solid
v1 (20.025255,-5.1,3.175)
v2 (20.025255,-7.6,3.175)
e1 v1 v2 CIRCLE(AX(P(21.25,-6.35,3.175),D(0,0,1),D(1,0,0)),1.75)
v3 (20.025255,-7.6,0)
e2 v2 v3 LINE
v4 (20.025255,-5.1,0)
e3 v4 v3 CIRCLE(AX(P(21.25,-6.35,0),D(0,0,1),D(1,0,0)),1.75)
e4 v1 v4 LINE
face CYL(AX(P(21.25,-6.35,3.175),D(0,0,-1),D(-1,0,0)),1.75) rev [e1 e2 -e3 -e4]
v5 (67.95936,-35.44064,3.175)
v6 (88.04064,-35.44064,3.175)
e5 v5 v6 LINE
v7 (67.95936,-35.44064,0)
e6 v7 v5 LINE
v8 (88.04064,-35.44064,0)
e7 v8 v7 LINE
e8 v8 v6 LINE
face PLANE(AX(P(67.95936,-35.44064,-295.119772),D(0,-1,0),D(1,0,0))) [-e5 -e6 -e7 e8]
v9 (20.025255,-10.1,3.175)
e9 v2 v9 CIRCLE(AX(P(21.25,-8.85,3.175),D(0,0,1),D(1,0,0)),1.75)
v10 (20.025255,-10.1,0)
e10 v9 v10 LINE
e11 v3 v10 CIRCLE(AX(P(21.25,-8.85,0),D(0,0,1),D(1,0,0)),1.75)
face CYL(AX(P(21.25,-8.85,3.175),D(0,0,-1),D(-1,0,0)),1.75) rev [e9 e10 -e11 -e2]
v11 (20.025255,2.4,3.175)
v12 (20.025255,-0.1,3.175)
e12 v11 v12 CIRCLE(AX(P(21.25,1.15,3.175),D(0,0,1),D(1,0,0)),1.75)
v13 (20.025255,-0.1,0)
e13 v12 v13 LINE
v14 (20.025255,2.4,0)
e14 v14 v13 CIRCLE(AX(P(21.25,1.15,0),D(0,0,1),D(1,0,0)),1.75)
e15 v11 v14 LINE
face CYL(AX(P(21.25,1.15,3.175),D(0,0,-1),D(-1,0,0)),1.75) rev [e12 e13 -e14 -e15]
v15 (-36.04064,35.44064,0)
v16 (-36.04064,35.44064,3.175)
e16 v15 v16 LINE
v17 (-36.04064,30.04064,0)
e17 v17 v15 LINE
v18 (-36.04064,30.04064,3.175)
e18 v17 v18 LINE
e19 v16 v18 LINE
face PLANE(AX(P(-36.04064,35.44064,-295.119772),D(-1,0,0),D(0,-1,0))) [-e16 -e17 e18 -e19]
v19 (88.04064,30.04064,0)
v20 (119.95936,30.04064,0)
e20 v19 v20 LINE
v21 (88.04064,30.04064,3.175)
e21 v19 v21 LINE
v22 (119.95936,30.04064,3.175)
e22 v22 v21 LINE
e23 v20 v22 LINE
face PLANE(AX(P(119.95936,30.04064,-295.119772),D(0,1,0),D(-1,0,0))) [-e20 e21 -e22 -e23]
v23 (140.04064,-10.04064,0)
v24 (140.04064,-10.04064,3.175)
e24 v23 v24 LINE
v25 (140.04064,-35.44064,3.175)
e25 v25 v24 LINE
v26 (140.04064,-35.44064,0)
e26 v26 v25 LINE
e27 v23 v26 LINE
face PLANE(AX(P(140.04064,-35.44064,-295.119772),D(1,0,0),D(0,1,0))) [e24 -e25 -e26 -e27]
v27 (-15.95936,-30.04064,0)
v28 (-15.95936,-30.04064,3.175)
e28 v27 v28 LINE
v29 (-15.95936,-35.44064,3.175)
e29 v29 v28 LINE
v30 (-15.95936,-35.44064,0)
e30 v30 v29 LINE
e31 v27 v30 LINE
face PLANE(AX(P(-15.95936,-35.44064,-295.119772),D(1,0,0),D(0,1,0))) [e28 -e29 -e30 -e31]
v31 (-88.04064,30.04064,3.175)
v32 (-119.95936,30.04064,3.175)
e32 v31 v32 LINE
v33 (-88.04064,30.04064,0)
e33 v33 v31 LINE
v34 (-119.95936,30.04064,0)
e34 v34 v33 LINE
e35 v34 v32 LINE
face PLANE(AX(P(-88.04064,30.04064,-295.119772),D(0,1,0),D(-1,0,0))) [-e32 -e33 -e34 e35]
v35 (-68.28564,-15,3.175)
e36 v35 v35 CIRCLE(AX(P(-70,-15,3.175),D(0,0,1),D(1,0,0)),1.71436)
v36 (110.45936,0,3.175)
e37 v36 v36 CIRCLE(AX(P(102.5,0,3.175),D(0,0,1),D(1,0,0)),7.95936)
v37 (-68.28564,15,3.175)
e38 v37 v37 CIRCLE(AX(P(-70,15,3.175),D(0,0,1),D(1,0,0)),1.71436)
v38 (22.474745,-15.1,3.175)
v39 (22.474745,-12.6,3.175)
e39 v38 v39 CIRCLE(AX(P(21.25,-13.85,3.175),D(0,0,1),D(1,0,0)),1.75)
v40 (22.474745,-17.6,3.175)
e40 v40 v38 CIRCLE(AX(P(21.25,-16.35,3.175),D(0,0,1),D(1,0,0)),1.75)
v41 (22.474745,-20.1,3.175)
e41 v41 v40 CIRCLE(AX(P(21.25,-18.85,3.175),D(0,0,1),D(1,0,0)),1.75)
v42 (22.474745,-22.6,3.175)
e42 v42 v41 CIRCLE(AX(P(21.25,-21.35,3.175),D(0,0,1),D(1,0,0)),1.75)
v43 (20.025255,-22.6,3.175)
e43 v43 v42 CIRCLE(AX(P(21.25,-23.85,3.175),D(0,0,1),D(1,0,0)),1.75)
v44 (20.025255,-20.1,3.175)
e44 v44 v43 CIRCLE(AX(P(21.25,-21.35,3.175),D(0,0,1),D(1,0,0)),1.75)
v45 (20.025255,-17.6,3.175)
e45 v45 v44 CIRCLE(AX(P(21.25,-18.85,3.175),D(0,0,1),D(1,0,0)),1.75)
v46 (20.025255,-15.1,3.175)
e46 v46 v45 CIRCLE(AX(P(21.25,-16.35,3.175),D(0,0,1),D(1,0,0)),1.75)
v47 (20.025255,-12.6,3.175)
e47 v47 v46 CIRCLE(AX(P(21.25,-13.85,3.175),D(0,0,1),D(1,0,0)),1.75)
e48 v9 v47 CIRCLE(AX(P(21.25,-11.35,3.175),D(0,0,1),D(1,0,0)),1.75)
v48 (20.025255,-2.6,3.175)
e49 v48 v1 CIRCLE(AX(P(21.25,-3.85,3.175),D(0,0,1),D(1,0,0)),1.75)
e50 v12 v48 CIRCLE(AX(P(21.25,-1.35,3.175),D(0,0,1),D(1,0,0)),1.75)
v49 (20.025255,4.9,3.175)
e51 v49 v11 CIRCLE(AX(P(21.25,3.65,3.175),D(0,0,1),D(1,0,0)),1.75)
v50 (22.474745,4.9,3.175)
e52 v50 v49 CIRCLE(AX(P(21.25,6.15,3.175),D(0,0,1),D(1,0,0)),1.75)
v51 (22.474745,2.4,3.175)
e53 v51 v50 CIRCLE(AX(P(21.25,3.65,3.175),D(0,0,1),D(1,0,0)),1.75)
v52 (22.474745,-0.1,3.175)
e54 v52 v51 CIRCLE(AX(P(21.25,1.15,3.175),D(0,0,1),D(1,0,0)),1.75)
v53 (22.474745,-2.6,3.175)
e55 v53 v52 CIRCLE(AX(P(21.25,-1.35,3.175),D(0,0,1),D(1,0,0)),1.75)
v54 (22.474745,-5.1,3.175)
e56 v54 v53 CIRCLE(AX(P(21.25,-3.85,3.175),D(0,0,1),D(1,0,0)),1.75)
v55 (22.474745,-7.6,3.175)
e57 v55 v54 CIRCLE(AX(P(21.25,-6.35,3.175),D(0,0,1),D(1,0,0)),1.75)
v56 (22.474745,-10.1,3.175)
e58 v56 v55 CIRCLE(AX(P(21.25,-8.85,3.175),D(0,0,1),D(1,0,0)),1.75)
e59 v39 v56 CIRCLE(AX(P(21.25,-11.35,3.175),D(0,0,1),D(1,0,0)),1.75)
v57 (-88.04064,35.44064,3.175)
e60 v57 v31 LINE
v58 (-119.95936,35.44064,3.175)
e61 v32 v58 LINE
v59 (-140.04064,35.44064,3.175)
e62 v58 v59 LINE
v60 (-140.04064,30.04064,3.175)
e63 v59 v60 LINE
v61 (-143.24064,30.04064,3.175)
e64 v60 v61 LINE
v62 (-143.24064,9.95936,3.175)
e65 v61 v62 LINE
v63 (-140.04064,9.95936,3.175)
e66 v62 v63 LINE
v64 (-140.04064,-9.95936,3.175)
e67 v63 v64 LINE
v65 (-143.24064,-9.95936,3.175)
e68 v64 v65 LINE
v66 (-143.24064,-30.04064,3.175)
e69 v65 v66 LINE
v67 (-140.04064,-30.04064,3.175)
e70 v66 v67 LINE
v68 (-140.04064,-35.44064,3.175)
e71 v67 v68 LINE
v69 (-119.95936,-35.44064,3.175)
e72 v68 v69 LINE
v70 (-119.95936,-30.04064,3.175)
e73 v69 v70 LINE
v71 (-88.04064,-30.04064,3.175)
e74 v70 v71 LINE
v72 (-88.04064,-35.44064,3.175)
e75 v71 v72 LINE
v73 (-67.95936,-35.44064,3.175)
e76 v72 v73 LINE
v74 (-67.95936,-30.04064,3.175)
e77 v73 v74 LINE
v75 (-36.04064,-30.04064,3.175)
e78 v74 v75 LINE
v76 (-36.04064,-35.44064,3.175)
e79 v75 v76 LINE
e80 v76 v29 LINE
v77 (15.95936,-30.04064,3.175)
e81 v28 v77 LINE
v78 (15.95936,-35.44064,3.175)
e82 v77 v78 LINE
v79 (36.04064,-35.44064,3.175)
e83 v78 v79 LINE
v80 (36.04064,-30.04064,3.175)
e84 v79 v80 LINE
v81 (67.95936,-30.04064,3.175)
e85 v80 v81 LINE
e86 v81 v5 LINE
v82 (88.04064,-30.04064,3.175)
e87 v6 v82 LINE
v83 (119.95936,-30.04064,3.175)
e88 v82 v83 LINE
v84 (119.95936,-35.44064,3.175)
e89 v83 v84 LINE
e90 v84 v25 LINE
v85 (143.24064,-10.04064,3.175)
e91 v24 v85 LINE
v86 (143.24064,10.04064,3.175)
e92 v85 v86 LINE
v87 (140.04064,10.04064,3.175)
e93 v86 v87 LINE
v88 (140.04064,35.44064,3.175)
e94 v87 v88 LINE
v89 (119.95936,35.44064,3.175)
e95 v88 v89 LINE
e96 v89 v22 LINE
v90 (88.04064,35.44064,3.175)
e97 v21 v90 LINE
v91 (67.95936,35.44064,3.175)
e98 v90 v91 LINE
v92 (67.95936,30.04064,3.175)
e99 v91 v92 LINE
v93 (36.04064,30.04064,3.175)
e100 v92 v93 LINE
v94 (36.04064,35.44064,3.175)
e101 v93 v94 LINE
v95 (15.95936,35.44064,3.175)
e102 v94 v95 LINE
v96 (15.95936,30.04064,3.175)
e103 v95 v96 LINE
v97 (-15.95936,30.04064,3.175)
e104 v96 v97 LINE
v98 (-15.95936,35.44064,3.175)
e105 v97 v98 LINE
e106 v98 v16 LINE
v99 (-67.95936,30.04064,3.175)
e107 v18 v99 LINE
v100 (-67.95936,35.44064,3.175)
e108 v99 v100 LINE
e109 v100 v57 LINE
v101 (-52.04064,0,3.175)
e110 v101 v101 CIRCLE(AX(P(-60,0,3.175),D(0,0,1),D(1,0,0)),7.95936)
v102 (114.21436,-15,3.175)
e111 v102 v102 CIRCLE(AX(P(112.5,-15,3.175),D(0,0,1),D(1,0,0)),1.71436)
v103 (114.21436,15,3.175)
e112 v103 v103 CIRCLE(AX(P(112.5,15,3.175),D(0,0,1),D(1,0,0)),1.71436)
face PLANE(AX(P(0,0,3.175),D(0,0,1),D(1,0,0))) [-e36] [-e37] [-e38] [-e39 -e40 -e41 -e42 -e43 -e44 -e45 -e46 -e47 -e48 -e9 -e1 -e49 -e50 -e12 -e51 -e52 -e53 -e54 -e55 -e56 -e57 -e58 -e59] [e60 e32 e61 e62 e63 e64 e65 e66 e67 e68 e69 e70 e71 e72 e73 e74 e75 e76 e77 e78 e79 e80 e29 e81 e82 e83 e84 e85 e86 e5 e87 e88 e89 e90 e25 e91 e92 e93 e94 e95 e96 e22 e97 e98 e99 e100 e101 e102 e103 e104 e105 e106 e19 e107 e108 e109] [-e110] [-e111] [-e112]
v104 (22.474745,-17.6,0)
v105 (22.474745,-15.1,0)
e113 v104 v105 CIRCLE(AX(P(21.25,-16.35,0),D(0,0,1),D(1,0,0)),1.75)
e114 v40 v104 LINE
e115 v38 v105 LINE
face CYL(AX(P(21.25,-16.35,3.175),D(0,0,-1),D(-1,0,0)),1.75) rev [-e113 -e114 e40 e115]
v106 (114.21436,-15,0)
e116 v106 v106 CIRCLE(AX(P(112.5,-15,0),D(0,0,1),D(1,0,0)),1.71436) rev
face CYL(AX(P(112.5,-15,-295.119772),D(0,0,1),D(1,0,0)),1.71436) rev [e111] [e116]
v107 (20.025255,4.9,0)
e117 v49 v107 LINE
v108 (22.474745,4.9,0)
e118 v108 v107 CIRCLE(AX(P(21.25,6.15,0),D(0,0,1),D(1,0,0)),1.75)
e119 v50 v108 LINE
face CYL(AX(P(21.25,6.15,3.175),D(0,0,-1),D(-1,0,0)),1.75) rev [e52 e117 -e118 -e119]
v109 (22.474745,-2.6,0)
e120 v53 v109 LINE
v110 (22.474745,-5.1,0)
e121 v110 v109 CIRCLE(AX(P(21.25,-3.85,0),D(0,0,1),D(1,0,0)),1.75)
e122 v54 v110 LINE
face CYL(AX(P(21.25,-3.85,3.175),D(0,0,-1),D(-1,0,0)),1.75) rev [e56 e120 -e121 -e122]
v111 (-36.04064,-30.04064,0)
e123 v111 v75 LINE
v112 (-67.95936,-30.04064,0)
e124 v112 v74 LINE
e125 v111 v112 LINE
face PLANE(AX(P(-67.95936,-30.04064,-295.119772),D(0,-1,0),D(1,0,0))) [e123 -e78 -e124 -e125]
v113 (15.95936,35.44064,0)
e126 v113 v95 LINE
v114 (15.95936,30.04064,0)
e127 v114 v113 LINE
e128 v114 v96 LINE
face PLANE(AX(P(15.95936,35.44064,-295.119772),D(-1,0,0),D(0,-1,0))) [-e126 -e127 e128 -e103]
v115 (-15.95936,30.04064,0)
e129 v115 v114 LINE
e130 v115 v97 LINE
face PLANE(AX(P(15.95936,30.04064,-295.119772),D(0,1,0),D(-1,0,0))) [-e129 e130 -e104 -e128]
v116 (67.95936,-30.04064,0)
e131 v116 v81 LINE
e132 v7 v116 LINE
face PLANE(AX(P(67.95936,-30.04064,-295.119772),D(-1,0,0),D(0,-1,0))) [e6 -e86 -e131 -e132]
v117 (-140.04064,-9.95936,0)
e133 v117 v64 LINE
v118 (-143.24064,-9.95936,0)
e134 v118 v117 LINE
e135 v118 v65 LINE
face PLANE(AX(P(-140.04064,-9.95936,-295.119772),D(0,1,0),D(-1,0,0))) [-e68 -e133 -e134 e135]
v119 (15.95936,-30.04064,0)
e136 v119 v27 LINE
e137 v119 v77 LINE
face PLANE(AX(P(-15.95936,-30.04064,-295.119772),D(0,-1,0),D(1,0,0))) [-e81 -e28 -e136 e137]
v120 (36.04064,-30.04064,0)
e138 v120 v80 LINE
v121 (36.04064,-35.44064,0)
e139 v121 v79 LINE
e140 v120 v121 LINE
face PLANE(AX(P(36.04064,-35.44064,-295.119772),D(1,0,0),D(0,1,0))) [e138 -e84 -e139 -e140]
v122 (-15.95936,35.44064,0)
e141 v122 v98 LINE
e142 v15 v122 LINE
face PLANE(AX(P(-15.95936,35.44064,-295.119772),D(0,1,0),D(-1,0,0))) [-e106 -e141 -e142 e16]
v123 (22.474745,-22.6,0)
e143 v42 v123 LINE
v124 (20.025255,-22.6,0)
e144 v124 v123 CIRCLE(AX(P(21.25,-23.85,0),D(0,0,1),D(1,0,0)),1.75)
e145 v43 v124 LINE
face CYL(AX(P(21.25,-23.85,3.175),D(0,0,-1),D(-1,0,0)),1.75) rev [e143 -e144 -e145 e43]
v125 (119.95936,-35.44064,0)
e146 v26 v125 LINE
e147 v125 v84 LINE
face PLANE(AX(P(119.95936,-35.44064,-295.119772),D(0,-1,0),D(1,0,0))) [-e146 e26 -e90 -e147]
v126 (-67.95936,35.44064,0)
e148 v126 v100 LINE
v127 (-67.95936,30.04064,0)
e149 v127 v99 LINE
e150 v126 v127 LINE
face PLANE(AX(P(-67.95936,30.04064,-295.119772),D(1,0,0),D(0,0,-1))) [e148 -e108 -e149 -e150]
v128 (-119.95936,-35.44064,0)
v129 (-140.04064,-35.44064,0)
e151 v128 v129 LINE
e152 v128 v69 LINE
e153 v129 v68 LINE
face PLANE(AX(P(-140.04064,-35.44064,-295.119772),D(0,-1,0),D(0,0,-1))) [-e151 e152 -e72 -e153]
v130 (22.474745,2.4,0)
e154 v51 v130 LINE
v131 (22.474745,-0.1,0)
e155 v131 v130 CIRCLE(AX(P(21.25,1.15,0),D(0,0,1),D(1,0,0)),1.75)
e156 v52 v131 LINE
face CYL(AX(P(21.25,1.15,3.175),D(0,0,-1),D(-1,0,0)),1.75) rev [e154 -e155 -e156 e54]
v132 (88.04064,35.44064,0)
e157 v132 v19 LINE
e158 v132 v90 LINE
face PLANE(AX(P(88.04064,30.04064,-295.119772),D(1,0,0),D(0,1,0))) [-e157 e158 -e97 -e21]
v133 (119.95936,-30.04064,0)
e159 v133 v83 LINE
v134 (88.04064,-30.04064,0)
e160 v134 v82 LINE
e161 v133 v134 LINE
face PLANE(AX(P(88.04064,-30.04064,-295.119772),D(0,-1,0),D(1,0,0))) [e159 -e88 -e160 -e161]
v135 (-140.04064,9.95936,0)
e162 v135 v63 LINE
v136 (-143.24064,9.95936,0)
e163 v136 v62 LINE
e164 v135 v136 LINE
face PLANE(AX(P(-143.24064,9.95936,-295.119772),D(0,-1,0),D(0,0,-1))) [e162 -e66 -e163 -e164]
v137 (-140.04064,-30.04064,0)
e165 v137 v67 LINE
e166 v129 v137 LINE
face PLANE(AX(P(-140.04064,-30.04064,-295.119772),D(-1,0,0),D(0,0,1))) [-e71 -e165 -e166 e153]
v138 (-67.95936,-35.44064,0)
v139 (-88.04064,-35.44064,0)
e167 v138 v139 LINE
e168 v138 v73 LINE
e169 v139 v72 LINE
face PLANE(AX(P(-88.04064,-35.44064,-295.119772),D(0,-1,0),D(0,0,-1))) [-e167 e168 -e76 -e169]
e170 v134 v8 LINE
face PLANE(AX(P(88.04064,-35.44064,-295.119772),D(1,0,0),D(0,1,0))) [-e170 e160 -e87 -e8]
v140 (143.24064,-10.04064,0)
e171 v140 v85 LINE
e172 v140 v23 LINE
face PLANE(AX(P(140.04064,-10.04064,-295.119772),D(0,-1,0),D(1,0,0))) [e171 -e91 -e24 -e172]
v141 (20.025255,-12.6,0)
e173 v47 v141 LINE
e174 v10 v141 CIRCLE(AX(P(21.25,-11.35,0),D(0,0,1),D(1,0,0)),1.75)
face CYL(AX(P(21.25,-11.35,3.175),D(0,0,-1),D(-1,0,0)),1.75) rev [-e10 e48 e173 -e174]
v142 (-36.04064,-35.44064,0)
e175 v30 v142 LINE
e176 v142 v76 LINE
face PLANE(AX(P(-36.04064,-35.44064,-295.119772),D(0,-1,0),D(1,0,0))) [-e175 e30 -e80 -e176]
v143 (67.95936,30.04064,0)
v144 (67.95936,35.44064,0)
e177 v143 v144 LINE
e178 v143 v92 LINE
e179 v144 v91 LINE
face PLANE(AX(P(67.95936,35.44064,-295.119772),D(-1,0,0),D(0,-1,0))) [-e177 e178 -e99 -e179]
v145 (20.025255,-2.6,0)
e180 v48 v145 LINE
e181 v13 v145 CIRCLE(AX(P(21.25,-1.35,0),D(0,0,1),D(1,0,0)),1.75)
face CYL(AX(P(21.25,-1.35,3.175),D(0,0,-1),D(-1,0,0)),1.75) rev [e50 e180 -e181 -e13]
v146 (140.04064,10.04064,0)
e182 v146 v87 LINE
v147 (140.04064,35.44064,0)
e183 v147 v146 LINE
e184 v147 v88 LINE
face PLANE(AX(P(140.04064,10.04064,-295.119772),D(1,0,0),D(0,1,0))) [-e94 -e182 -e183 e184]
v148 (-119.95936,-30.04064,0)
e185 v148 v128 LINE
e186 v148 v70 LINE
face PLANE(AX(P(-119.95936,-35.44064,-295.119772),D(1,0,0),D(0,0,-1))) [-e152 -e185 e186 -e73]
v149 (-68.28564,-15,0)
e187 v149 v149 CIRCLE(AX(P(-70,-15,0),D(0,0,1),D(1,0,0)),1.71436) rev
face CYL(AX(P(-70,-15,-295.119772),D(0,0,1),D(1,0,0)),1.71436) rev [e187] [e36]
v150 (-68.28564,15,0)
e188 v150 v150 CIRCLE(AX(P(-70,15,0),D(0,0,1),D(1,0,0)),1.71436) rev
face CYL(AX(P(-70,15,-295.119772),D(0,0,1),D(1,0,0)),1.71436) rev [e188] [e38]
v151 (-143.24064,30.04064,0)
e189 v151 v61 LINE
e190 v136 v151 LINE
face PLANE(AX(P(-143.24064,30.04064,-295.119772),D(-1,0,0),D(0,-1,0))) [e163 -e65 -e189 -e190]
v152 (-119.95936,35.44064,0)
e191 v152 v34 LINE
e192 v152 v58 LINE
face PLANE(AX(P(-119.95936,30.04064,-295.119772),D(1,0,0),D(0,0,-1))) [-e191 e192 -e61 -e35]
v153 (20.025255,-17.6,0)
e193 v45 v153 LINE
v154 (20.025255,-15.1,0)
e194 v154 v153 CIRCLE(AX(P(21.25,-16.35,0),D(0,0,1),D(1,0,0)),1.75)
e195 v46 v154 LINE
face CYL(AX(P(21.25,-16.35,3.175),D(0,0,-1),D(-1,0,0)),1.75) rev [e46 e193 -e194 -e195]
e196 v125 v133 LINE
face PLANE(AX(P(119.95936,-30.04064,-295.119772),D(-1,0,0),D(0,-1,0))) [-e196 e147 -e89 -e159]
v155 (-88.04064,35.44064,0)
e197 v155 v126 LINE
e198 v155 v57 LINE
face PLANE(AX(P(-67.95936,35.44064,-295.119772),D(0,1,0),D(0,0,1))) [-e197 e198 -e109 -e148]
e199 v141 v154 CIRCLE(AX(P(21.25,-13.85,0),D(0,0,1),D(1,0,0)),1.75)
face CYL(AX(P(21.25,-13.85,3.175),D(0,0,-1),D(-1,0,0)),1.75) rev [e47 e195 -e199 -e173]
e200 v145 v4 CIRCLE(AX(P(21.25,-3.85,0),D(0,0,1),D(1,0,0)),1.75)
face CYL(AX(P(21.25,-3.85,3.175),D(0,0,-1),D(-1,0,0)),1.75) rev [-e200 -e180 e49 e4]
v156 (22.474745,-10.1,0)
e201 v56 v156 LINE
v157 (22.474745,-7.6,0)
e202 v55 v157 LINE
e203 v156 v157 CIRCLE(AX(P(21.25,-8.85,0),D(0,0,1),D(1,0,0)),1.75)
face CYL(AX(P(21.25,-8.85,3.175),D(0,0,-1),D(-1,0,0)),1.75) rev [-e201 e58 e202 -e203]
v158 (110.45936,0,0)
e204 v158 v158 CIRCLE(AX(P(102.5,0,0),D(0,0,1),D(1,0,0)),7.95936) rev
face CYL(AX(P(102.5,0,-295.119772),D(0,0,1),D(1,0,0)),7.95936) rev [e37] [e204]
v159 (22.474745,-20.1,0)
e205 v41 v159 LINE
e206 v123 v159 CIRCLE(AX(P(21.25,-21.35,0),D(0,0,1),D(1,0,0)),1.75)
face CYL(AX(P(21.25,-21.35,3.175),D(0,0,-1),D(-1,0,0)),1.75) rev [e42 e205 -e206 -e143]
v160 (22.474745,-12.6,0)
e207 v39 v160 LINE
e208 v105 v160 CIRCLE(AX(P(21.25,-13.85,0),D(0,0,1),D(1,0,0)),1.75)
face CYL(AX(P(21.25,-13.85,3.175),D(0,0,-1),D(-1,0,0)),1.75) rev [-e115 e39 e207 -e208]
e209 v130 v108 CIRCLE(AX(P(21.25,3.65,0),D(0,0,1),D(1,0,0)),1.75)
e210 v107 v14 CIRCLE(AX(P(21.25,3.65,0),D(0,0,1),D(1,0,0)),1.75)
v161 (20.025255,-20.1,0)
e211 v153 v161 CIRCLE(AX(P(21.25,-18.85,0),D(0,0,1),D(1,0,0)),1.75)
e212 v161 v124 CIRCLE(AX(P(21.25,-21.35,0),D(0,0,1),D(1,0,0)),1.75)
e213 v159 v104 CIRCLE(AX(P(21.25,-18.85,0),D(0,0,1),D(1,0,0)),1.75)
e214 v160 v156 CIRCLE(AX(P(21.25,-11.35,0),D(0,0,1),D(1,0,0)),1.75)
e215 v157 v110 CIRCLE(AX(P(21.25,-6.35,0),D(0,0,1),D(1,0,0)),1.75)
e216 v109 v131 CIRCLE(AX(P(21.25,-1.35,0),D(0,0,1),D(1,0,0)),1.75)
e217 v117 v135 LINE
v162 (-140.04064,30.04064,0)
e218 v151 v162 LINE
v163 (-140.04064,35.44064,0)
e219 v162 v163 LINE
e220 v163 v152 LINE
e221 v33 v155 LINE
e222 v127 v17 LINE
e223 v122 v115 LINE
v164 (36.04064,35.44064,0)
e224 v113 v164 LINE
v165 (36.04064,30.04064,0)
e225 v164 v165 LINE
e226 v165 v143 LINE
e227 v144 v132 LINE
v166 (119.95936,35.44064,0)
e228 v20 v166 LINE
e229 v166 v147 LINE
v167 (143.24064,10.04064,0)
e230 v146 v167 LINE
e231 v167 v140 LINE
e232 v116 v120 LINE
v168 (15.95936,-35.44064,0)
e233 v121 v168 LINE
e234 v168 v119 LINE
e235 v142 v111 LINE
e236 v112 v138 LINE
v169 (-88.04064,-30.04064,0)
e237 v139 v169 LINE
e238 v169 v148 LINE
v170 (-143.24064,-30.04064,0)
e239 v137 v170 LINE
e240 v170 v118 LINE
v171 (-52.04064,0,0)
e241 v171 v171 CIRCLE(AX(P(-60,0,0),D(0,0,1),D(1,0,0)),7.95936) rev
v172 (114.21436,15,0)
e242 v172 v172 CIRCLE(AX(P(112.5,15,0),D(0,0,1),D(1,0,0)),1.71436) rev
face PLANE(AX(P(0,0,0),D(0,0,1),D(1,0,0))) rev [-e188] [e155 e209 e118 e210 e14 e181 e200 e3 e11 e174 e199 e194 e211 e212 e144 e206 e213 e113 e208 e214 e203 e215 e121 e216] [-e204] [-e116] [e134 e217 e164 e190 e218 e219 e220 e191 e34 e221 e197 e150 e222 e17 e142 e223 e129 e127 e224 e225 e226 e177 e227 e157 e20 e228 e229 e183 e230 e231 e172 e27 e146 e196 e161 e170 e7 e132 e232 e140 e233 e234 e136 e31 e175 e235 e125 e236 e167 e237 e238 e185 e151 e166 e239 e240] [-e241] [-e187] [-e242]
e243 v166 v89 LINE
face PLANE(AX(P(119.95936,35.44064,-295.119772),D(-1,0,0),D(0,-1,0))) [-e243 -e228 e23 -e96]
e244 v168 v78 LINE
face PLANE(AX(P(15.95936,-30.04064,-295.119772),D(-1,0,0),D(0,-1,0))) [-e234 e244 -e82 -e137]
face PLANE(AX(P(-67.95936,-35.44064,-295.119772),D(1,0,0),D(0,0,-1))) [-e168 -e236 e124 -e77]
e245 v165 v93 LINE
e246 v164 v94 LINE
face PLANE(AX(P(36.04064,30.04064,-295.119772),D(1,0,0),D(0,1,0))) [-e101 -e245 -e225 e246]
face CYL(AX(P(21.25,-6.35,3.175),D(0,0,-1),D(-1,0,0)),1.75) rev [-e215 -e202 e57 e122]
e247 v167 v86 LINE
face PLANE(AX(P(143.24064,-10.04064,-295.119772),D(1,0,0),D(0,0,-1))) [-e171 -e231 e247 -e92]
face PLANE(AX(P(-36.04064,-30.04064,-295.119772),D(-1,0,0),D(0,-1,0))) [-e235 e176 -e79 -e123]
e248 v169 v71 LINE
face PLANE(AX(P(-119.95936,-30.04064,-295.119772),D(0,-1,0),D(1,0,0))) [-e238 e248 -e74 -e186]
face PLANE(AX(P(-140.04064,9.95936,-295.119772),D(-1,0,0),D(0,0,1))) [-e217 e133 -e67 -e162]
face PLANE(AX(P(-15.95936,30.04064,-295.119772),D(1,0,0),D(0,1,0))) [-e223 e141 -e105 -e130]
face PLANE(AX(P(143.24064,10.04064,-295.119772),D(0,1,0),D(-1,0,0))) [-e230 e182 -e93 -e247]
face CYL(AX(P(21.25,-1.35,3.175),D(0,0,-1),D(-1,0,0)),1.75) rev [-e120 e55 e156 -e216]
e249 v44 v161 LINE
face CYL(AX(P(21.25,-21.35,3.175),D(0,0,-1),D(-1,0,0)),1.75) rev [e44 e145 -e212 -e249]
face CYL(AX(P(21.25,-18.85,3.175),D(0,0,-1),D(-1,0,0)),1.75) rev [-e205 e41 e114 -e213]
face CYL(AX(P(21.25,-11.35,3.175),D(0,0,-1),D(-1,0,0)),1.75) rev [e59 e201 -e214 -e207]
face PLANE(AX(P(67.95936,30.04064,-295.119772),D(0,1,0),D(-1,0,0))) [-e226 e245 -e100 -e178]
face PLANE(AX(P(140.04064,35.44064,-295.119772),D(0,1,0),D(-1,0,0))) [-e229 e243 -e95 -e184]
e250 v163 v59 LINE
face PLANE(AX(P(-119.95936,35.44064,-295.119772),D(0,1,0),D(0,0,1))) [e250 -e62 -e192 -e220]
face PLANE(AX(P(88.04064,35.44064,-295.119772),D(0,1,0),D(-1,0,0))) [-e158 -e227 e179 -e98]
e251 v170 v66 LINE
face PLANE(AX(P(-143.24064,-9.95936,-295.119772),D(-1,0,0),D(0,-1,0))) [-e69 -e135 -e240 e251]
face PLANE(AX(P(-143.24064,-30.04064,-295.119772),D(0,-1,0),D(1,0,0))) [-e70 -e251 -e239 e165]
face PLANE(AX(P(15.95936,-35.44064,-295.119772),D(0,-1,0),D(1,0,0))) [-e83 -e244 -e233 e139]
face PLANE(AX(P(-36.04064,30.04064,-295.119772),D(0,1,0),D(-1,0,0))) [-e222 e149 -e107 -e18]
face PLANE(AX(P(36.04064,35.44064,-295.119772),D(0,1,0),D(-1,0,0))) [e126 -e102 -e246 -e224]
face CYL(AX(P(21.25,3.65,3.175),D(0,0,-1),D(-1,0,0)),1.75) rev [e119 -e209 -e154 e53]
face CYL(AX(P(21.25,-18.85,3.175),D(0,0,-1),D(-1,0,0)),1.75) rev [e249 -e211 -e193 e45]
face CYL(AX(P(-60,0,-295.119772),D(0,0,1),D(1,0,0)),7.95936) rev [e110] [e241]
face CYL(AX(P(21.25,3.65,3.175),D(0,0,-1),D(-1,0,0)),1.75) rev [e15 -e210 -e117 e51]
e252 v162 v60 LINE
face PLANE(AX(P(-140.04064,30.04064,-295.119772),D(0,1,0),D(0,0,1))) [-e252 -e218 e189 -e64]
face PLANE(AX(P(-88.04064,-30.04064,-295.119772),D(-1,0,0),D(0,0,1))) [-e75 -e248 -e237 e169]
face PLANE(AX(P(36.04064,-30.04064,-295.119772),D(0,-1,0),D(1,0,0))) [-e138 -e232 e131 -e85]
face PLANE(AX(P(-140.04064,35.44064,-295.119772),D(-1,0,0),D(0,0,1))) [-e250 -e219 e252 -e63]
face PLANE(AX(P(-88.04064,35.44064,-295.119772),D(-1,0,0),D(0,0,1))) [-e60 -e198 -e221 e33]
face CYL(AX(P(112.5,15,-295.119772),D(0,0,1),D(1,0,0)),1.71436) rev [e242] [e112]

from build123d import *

# Parameters (mm, degrees)
BOSS_EXTRUDE1_OUTLINE_R   = 1.755
BOSS_EXTRUDE1_OUTLINE_R_2 = 8
BOSS_EXTRUDE1_DEPTH       = 3.175
BOSS_EXTRUDE2_START       = -3.175
SKETCH5_R                 = 7.95936
SKETCH5_R_2               = 1.71436
BOSS_EXTRUDE2_DEPTH       = 3.175


# Read off the part's stored shape, not the designer's step: Boss-Extrude1
with BuildPart() as part:
    # Boss-Extrude1 outline → Boss-Extrude1 (new body)
    with BuildSketch(Plane.XY):
        Polygon((-140, 10), (-140, -10), (-143.2, -10), (-143.2, -30), (-140, -30), (-140, -35.4), (-120, -35.4), (-120, -30), (-88, -30), (-88, -35.4), (-68, -35.4), (-68, -30), (-36, -30), (-36, -35.4), (-16, -35.4), (-16, -30), (16, -30), (16, -35.4), (36, -35.4), (36, -30), (68, -30), (68, -35.4), (88, -35.4), (88, -30), (120, -30), (120, -35.4), (140, -35.4), (140, -10), (143.2, -10), (143.2, 10), (140, 10), (140, 35.4), (120, 35.4), (120, 30), (88, 30), (88, 35.4), (68, 35.4), (68, 30), (36, 30), (36, 35.4), (16, 35.4), (16, 30), (-16, 30), (-16, 35.4), (-36, 35.4), (-36, 30), (-68, 30), (-68, 35.4), (-88, 35.4), (-88, 30), (-120, 30), (-120, 35.4), (-140, 35.4), (-140, 30), (-143.2, 30), (-143.2, 10), align=None)
        with Locations((-70, -15)):
            Circle(BOSS_EXTRUDE1_OUTLINE_R, mode=Mode.SUBTRACT)
        with BuildLine():
            ThreePointArc((22.474744871, -20.1), (23, -21.35), (22.474744871, -22.6))
            ThreePointArc((22.474744871, -22.6), (21.25, -25.6), (20.025255129, -22.6))
            ThreePointArc((20.025255129, -22.6), (19.5, -21.35), (20.025255129, -20.1))
            ThreePointArc((20.025255129, -20.1), (19.5, -18.85), (20.025255129, -17.6))
            ThreePointArc((20.025255129, -17.6), (19.5, -16.35), (20.025255129, -15.1))
            ThreePointArc((20.025255129, -15.1), (19.5, -13.85), (20.025255129, -12.6))
            ThreePointArc((20.025255129, -12.6), (19.5, -11.35), (20.025255129, -10.1))
            ThreePointArc((20.025255129, -10.1), (19.5, -8.85), (20.025255129, -7.6))
            ThreePointArc((20.025255129, -7.6), (19.5, -6.35), (20.025255129, -5.1))
            ThreePointArc((20.025255129, -5.1), (19.5, -3.85), (20.025255129, -2.6))
            ThreePointArc((20.025255129, -2.6), (19.5, -1.35), (20.025255129, -0.1))
            ThreePointArc((20.025255129, -0.1), (19.5, 1.15), (20.025255129, 2.4))
            ThreePointArc((20.025255129, 2.4), (19.5, 3.65), (20.025255129, 4.9))
            ThreePointArc((20.025255129, 4.9), (21.25, 7.9), (22.474744871, 4.9))
            ThreePointArc((22.474744871, 4.9), (23, 3.65), (22.474744871, 2.4))
            ThreePointArc((22.474744871, 2.4), (23, 1.15), (22.474744871, -0.1))
            ThreePointArc((22.474744871, -0.1), (23, -1.35), (22.474744871, -2.6))
            ThreePointArc((22.474744871, -2.6), (23, -3.85), (22.474744871, -5.1))
            ThreePointArc((22.474744871, -5.1), (23, -6.35), (22.474744871, -7.6))
            ThreePointArc((22.474744871, -7.6), (23, -8.85), (22.474744871, -10.1))
            ThreePointArc((22.474744871, -10.1), (23, -11.35), (22.474744871, -12.6))
            ThreePointArc((22.474744871, -12.6), (23, -13.85), (22.474744871, -15.1))
            ThreePointArc((22.474744871, -15.1), (23, -16.35), (22.474744871, -17.6))
            ThreePointArc((22.474744871, -17.6), (23, -18.85), (22.474744871, -20.1))
        make_face(mode=Mode.SUBTRACT)
        with Locations((112.5, -15)):
            Circle(BOSS_EXTRUDE1_OUTLINE_R, mode=Mode.SUBTRACT)
        with Locations((-60, 0)):
            Circle(BOSS_EXTRUDE1_OUTLINE_R_2, mode=Mode.SUBTRACT)
        with Locations((-70, 15)):
            Circle(BOSS_EXTRUDE1_OUTLINE_R, mode=Mode.SUBTRACT)
        with Locations((102.5, 0)):
            Circle(BOSS_EXTRUDE1_OUTLINE_R_2, mode=Mode.SUBTRACT)
        with Locations((112.5, 15)):
            Circle(BOSS_EXTRUDE1_OUTLINE_R, mode=Mode.SUBTRACT)
    extrude(amount=BOSS_EXTRUDE1_DEPTH)

    # Sketch5 → Boss-Extrude2 (add)
    with BuildSketch(Plane.XY.offset(3.175).offset(BOSS_EXTRUDE2_START)):
        Polygon((140.04064, 10.04064), (140.04064, 35.44064), (119.95936, 35.44064), (119.95936, 30.04064), (88.04064, 30.04064), (88.04064, 35.44064), (67.95936, 35.44064), (67.95936, 30.04064), (36.04064, 30.04064), (36.04064, 35.44064), (15.95936, 35.44064), (15.95936, 30.04064), (-15.95936, 30.04064), (-15.95936, 35.44064), (-36.04064, 35.44064), (-36.04064, 30.04064), (-67.95936, 30.04064), (-67.95936, 35.44064), (-88.04064, 35.44064), (-88.04064, 30.04064), (-119.95936, 30.04064), (-119.95936, 35.44064), (-140.04064, 35.44064), (-140.04064, 30.04064), (-143.24064, 30.04064), (-143.24064, 9.95936), (-140.04064, 9.95936), (-140.04064, -9.95936), (-143.24064, -9.95936), (-143.24064, -30.04064), (-140.04064, -30.04064), (-140.04064, -35.44064), (-119.95936, -35.44064), (-119.95936, -30.04064), (-88.04064, -30.04064), (-88.04064, -35.44064), (-67.95936, -35.44064), (-67.95936, -30.04064), (-36.04064, -30.04064), (-36.04064, -35.44064), (-15.95936, -35.44064), (-15.95936, -30.04064), (15.95936, -30.04064), (15.95936, -35.44064), (36.04064, -35.44064), (36.04064, -30.04064), (67.95936, -30.04064), (67.95936, -35.44064), (88.04064, -35.44064), (88.04064, -30.04064), (119.95936, -30.04064), (119.95936, -35.44064), (140.04064, -35.44064), (140.04064, -10.04064), (143.24064, -10.04064), (143.24064, 10.04064), align=None)
        with Locations((-60, 0)):
            Circle(SKETCH5_R, mode=Mode.SUBTRACT)
        with Locations((-70, 15)):
            Circle(SKETCH5_R_2, mode=Mode.SUBTRACT)
        with Locations((-70, -15)):
            Circle(SKETCH5_R_2, mode=Mode.SUBTRACT)
        with Locations((102.5, 0)):
            Circle(SKETCH5_R, mode=Mode.SUBTRACT)
        with Locations((112.5, 15)):
            Circle(SKETCH5_R_2, mode=Mode.SUBTRACT)
        with Locations((112.5, -15)):
            Circle(SKETCH5_R_2, mode=Mode.SUBTRACT)
        with BuildLine():
            ThreePointArc((22.474744871, 4.9), (21.25, 7.9), (20.025255129, 4.9))
            ThreePointArc((20.025255129, 4.9), (19.5, 3.65), (20.025255129, 2.4))
            ThreePointArc((20.025255129, 2.4), (19.5, 1.15), (20.025255129, -0.1))
            ThreePointArc((20.025255129, -0.1), (19.5, -1.35), (20.025255129, -2.6))
            ThreePointArc((20.025255129, -2.6), (19.5, -3.85), (20.025255129, -5.1))
            ThreePointArc((20.025255129, -5.1), (19.5, -6.35), (20.025255129, -7.6))
            ThreePointArc((20.025255129, -7.6), (19.5, -8.85), (20.025255129, -10.1))
            ThreePointArc((20.025255129, -10.1), (19.5, -11.35), (20.025255129, -12.6))
            ThreePointArc((20.025255129, -12.6), (19.5, -13.85), (20.025255129, -15.1))
            ThreePointArc((20.025255129, -15.1), (19.5, -16.35), (20.025255129, -17.6))
            ThreePointArc((20.025255129, -17.6), (19.5, -18.85), (20.025255129, -20.1))
            ThreePointArc((20.025255129, -20.1), (19.5, -21.35), (20.025255129, -22.6))
            ThreePointArc((20.025255129, -22.6), (21.25, -25.6), (22.474744871, -22.6))
            ThreePointArc((22.474744871, -22.6), (23, -21.35), (22.474744871, -20.1))
            ThreePointArc((22.474744871, -20.1), (23, -18.85), (22.474744871, -17.6))
            ThreePointArc((22.474744871, -17.6), (23, -16.35), (22.474744871, -15.1))
            ThreePointArc((22.474744871, -15.1), (23, -13.85), (22.474744871, -12.6))
            ThreePointArc((22.474744871, -12.6), (23, -11.35), (22.474744871, -10.1))
            ThreePointArc((22.474744871, -10.1), (23, -8.85), (22.474744871, -7.6))
            ThreePointArc((22.474744871, -7.6), (23, -6.35), (22.474744871, -5.1))
            ThreePointArc((22.474744871, -5.1), (23, -3.85), (22.474744871, -2.6))
            ThreePointArc((22.474744871, -2.6), (23, -1.35), (22.474744871, -0.1))
            ThreePointArc((22.474744871, -0.1), (23, 1.15), (22.474744871, 2.4))
            ThreePointArc((22.474744871, 2.4), (23, 3.65), (22.474744871, 4.9))
        make_face(mode=Mode.SUBTRACT)
    extrude(amount=BOSS_EXTRUDE2_DEPTH)


solid = part.part
